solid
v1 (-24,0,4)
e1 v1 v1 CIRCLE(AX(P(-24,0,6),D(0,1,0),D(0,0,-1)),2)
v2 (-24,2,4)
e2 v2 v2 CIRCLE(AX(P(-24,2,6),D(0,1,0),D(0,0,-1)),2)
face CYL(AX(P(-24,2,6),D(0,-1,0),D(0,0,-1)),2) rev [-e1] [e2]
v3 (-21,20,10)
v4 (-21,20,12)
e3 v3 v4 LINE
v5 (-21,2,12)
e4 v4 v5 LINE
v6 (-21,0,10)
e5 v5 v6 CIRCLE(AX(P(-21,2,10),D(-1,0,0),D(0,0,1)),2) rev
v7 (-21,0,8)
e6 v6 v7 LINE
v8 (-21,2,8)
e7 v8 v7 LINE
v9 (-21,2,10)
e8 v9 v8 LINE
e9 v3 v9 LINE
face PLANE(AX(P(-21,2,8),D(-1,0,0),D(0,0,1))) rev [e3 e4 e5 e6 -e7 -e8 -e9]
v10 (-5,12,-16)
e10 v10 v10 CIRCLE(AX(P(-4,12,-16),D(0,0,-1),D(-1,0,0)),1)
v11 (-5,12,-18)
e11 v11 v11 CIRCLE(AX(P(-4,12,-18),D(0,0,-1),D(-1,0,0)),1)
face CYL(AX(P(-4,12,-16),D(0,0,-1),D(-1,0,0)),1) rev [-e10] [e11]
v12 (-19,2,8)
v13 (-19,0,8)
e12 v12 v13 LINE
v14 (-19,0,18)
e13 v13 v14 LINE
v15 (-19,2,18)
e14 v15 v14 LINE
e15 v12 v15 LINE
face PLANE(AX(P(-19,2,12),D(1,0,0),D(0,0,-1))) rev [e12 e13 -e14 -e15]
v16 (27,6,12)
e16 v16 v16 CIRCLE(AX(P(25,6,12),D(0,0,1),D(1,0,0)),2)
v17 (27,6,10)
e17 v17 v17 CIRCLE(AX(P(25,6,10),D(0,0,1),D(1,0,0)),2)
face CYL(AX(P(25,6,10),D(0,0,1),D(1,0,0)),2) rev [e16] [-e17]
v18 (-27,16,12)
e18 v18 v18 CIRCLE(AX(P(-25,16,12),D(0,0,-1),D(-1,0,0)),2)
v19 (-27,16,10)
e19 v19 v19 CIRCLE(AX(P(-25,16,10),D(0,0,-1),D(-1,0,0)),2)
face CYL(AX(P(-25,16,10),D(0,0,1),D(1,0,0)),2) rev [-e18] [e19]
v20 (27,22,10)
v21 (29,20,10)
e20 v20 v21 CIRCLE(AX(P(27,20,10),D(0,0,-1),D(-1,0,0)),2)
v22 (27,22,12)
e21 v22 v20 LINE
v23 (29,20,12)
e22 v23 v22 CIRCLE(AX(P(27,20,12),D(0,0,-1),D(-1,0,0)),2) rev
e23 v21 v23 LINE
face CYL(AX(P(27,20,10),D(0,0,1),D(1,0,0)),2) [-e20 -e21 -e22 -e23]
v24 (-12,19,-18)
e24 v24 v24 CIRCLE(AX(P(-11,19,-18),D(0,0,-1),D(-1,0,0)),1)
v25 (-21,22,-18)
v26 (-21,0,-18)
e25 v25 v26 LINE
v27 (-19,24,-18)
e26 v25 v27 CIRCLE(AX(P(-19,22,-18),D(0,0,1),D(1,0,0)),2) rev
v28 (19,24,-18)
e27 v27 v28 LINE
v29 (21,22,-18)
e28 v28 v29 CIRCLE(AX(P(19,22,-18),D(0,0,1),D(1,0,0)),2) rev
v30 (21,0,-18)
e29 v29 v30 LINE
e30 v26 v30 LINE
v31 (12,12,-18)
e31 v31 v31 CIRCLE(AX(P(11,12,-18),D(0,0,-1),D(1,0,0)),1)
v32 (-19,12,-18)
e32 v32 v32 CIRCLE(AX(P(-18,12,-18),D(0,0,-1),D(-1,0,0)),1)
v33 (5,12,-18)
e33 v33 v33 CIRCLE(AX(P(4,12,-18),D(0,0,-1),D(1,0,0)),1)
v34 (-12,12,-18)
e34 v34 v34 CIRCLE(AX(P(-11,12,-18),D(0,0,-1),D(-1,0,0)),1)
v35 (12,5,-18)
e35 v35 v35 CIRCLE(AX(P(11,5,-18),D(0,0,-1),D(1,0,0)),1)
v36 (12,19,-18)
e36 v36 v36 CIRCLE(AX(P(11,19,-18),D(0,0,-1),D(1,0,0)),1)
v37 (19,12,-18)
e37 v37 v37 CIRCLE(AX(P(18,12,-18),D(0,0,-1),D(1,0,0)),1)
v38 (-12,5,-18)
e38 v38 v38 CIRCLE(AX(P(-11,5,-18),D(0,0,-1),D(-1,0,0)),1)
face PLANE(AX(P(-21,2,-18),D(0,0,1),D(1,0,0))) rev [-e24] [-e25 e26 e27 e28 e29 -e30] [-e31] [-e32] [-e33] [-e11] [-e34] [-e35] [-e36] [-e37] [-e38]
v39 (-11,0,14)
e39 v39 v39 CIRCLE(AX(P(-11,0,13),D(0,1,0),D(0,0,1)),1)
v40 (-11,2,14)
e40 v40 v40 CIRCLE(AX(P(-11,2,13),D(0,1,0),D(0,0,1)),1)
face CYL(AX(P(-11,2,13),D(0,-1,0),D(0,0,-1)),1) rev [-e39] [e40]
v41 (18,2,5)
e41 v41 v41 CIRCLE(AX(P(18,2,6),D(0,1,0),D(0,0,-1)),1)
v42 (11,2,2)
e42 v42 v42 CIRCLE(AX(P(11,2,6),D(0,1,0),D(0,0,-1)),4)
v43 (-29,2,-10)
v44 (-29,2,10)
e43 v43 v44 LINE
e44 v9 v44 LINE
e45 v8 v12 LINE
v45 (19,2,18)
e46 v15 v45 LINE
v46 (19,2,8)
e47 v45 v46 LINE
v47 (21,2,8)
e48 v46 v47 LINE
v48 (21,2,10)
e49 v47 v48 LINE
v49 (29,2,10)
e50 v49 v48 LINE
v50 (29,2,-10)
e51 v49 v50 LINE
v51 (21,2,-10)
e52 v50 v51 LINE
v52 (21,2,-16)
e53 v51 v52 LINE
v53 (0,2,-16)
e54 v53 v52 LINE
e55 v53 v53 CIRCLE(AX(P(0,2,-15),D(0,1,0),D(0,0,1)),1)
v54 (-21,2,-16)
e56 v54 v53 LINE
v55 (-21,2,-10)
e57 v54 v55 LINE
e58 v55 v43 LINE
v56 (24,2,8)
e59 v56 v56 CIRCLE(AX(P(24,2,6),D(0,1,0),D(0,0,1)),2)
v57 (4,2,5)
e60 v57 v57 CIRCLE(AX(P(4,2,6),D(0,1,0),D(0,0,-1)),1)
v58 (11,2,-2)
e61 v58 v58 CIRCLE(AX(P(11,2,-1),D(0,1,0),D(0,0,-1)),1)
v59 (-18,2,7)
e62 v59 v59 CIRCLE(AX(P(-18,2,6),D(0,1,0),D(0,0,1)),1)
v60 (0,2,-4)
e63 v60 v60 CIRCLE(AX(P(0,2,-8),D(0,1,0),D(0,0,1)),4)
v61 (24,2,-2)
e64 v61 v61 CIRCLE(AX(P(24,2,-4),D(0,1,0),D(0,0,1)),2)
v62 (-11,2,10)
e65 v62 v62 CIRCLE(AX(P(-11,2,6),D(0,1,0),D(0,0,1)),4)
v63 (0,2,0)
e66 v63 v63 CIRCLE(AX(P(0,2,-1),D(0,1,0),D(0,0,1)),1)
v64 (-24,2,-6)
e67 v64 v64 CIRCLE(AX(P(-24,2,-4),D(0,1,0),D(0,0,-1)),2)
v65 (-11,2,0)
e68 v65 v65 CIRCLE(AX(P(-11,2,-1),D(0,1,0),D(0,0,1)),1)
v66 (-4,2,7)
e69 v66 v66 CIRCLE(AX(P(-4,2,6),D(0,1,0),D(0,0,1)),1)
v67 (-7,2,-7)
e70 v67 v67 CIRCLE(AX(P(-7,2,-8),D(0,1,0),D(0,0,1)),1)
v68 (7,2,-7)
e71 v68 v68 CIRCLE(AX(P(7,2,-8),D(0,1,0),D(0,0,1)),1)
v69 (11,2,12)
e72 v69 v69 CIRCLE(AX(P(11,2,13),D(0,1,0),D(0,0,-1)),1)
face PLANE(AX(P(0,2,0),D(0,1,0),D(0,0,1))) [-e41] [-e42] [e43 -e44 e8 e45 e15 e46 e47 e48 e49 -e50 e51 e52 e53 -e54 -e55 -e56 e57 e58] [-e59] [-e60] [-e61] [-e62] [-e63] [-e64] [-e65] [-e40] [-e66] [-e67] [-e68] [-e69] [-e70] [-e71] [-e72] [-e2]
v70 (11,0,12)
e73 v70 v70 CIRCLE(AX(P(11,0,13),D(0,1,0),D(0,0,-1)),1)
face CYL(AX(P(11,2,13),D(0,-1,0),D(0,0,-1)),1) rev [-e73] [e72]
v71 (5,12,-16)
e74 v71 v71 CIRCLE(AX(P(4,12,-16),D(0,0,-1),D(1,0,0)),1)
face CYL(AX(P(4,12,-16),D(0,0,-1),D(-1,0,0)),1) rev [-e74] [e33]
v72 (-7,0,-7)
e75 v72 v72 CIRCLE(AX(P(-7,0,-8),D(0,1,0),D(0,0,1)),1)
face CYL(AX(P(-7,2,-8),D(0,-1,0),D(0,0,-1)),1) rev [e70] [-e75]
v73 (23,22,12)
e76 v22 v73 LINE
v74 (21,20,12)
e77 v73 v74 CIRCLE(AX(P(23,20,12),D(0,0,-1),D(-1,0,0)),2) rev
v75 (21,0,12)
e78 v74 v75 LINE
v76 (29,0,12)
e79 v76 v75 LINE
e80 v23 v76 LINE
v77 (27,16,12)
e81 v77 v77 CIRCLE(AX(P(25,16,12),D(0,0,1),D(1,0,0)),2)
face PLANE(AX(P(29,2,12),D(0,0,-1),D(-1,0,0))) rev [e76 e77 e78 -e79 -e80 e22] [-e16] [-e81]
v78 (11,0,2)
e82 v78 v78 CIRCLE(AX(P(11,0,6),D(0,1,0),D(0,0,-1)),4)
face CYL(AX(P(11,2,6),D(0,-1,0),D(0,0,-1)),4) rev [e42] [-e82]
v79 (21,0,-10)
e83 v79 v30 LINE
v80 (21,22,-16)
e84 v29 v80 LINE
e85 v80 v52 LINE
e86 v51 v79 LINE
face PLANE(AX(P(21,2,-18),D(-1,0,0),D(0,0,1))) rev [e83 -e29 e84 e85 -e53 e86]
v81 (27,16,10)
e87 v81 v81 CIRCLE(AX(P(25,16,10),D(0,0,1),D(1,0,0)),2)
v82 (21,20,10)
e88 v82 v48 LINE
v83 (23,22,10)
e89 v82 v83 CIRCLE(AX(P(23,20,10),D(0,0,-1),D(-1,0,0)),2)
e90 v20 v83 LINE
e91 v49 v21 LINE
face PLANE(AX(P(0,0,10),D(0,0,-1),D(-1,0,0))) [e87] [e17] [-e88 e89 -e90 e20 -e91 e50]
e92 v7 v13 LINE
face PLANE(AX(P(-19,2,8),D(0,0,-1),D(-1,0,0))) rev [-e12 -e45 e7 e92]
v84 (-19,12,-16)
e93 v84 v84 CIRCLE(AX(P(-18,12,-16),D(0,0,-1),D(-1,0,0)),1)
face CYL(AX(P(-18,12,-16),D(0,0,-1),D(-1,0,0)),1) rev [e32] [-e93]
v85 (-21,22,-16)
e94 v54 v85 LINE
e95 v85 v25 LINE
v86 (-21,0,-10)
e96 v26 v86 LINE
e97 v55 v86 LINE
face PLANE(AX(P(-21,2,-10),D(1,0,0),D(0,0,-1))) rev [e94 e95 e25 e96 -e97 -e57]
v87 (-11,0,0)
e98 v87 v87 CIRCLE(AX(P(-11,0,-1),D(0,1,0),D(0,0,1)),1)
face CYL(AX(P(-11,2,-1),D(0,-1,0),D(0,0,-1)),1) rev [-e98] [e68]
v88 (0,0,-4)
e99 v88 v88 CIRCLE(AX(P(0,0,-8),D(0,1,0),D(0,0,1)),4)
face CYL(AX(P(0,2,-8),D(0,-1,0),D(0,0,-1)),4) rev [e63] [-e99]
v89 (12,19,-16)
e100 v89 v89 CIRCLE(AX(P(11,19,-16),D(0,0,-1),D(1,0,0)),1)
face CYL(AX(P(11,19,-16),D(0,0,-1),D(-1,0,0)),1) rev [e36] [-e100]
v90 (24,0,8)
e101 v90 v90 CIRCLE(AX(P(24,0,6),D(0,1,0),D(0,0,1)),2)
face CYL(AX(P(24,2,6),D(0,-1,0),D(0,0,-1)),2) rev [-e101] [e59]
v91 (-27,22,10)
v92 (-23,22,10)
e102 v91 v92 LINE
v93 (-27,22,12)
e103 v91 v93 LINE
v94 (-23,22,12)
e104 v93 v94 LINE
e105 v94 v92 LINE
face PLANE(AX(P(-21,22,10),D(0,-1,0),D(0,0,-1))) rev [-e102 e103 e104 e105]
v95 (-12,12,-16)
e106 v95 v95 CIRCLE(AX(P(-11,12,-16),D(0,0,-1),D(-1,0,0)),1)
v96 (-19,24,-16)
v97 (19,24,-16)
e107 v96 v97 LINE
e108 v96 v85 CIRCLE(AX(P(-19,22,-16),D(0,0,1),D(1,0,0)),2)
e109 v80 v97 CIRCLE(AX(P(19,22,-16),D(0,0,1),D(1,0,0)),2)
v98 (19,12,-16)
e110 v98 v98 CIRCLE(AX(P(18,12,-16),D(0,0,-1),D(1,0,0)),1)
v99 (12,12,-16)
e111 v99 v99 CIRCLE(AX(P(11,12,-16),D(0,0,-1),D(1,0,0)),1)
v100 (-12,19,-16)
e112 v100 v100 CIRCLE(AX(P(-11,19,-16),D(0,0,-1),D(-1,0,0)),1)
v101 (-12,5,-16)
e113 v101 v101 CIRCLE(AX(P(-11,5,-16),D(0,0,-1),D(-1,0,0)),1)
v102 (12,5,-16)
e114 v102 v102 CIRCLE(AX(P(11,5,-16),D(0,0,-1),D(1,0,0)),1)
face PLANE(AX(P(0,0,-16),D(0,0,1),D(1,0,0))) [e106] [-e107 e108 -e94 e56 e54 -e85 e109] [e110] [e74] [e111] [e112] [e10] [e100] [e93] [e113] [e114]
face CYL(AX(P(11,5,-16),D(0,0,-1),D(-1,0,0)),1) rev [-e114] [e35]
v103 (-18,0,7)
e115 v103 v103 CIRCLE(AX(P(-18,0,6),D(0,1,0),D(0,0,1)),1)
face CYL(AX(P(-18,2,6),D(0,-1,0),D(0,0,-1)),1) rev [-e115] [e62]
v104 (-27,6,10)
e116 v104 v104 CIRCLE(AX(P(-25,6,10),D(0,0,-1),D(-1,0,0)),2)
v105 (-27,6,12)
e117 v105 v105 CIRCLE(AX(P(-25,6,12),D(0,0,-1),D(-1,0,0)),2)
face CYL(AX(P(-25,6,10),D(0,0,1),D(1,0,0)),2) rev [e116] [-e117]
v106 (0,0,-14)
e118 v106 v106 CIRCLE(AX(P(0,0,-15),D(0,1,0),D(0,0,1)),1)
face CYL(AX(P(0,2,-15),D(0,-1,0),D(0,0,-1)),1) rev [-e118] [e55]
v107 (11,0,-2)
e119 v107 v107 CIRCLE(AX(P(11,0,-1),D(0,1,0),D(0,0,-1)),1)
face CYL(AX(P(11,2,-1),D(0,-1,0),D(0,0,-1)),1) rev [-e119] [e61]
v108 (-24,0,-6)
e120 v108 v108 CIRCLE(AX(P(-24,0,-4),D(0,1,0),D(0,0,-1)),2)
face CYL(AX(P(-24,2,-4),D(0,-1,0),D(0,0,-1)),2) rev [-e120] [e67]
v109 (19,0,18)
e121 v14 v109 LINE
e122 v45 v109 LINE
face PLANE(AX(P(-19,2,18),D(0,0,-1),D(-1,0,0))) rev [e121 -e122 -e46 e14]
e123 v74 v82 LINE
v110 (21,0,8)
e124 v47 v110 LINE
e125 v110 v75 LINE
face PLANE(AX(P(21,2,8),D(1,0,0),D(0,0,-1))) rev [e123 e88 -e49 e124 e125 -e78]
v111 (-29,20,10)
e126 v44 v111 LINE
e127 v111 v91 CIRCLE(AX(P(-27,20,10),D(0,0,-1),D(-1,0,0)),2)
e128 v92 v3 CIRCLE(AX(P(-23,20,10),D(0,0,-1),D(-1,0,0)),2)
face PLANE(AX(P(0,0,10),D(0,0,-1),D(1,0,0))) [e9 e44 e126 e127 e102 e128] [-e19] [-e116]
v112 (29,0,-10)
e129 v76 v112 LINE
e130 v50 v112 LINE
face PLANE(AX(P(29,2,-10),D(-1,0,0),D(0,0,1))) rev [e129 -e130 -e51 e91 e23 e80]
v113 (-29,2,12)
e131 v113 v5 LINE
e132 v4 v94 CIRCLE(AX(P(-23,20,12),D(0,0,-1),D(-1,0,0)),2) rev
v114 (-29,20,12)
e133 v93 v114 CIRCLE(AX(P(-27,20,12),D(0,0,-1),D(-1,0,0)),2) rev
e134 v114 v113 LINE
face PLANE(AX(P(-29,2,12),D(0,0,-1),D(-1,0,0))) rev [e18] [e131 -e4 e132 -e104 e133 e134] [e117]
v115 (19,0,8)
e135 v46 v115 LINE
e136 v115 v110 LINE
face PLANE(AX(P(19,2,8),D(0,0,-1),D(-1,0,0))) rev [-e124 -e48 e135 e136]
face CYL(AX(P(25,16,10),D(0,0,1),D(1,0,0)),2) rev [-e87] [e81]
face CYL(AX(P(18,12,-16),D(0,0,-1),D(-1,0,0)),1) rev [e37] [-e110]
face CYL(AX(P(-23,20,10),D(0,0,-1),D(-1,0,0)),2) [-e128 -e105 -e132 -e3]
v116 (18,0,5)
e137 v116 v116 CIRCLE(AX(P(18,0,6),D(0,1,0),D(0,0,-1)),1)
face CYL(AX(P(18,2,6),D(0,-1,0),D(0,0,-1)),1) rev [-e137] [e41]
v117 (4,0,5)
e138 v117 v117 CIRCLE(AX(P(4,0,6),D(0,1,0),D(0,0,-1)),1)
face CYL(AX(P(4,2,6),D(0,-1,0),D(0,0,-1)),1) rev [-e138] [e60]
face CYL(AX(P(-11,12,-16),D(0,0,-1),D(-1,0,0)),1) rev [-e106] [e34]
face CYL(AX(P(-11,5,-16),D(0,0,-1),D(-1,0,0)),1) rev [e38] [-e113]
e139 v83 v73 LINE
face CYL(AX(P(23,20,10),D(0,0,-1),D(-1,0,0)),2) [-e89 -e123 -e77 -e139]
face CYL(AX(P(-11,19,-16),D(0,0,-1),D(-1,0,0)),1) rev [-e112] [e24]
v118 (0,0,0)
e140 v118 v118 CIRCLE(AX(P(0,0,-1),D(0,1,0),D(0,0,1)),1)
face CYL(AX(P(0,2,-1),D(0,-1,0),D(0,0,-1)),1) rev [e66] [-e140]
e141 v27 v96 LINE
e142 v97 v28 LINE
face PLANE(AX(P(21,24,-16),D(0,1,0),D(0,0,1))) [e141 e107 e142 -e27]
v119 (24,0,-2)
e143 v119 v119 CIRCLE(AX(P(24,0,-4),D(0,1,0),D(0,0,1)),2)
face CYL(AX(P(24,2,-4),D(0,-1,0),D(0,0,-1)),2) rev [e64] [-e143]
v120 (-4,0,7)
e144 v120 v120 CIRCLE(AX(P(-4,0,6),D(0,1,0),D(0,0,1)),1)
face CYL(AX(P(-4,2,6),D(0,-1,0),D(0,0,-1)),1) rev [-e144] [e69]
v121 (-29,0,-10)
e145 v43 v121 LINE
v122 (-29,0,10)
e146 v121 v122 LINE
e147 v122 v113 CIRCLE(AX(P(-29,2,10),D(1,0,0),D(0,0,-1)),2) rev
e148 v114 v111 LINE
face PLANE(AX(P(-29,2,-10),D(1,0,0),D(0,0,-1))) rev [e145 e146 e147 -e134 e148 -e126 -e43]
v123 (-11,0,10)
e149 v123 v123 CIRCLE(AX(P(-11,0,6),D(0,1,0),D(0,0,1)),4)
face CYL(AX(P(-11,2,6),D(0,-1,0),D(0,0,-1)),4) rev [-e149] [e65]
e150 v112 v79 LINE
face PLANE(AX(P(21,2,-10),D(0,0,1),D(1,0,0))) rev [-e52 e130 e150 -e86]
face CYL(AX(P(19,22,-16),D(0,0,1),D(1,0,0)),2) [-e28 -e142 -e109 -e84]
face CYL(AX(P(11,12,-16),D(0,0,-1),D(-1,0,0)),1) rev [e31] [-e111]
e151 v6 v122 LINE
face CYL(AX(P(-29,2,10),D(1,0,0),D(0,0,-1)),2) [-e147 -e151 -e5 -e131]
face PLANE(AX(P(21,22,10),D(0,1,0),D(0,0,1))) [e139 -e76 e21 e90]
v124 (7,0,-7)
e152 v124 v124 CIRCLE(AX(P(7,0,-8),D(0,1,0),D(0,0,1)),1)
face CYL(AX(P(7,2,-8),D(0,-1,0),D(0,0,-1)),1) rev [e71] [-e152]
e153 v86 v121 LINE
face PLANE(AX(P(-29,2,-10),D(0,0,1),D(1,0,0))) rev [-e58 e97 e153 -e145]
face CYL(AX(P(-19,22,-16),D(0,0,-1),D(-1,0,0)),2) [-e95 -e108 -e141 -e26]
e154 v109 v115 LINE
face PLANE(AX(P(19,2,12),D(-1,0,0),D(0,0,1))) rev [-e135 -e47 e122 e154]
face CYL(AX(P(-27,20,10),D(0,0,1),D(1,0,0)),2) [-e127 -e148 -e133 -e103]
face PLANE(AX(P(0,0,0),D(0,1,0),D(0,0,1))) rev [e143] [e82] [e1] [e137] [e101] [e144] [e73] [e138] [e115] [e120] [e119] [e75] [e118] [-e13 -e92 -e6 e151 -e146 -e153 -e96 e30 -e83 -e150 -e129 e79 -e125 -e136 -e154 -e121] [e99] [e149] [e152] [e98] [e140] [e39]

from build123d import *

# Parameters (mm, degrees)
SKETCH_1_R              = 4
SKETCH_1_R_2            = 1
SKETCH_1_R_3            = 2
EXTRUDE_1_DEPTH         = 2
FILLET_1_R              = 2
FILLET_2_R              = 2
FILLET_3_R              = 2
FILLET_4_R              = 2
SKETCH_2_W              = 42
SKETCH_2_H              = 24
SKETCH_2_R              = 1
EXTRUDE_2_DEPTH         = 2
FILLET_5_R              = 2
FILLET_6_R              = 2
FILLET_7_R              = 2
SKETCH_3_W              = 8
SKETCH_3_H              = 22
SKETCH_3_R              = 2
EXTRUDE_3_DEPTH         = 2
FILLET_8_R              = 2
FILLET_9_R              = 2
FILLET_10_R             = 2
FILLET_10_OF_MIRROR_3_R = 2
FILLET_11_R             = 2
FILLET_12_R             = 2


with BuildPart() as part:
    # 草图1 → 凸台-拉伸1 (new body)
    with BuildSketch(Plane(origin=(0, 0, 0), x_dir=(1, 0, 0), z_dir=(0, 1, 0))):
        Polygon((-29, 10), (-21, 10), (-21, 18), (21, 18), (21, 10), (29, 10), (29, -12), (21, -12), (21, -8), (19, -8), (19, -12), (19, -18), (-19, -18), (-19, -12), (-19, -8), (-21, -8), (-21, -12), (-29, -12), align=None)
        with Locations(Location((-11, -6, 0), (0, 0, 270))):
            Circle(SKETCH_1_R, mode=Mode.SUBTRACT)
        with Locations(Location((-11, 1, 0), (0, 0, 270))):
            Circle(SKETCH_1_R_2, mode=Mode.SUBTRACT)
        with Locations(Location((0, 8, 0), (0, 0, 270))):
            Circle(SKETCH_1_R, mode=Mode.SUBTRACT)
        with Locations(Location((0, 15, 0), (0, 0, 270))):
            Circle(SKETCH_1_R_2, mode=Mode.SUBTRACT)
        with Locations(Location((7, 8, 0), (0, 0, 270))):
            Circle(SKETCH_1_R_2, mode=Mode.SUBTRACT)
        with Locations(Location((0, 1, 0), (0, 0, 270))):
            Circle(SKETCH_1_R_2, mode=Mode.SUBTRACT)
        with Locations(Location((-7, 8, 0), (0, 0, 270))):
            Circle(SKETCH_1_R_2, mode=Mode.SUBTRACT)
        with Locations(Location((-4, -6, 0), (0, 0, 270))):
            Circle(SKETCH_1_R_2, mode=Mode.SUBTRACT)
        with Locations(Location((-11, -13, 0), (0, 0, 270))):
            Circle(SKETCH_1_R_2, mode=Mode.SUBTRACT)
        with Locations(Location((-18, -6, 0), (0, 0, 270))):
            Circle(SKETCH_1_R_2, mode=Mode.SUBTRACT)
        with Locations(Location((18, -6, 0), (0, 0, 90))):
            Circle(SKETCH_1_R_2, mode=Mode.SUBTRACT)
        with Locations(Location((11, -13, 0), (0, 0, 90))):
            Circle(SKETCH_1_R_2, mode=Mode.SUBTRACT)
        with Locations(Location((4, -6, 0), (0, 0, 90))):
            Circle(SKETCH_1_R_2, mode=Mode.SUBTRACT)
        with Locations(Location((11, -6, 0), (0, 0, 90))):
            Circle(SKETCH_1_R, mode=Mode.SUBTRACT)
        with Locations(Location((11, 1, 0), (0, 0, 90))):
            Circle(SKETCH_1_R_2, mode=Mode.SUBTRACT)
        with Locations(Location((24, -6, 0), (0, 0, 270))):
            Circle(SKETCH_1_R_3, mode=Mode.SUBTRACT)
        with Locations(Location((24, 4, 0), (0, 0, 270))):
            Circle(SKETCH_1_R_3, mode=Mode.SUBTRACT)
        with Locations(Location((-24, -6, 0), (0, 0, 90))):
            Circle(SKETCH_1_R_3, mode=Mode.SUBTRACT)
        with Locations(Location((-24, 4, 0), (0, 0, 90))):
            Circle(SKETCH_1_R_3, mode=Mode.SUBTRACT)
    extrude_1 = extrude(amount=EXTRUDE_1_DEPTH)

    # 圆角1
    fillet_1_edges = [part.edges().sort_by_distance(p)[0] for p in [
        (29, 1, -10),
    ]]
    fillet(fillet_1_edges, radius=FILLET_1_R)

    # 圆角2
    fillet_2_edges = [part.edges().sort_by_distance(p)[0] for p in [
        (-29, 1, -10),
    ]]
    fillet(fillet_2_edges, radius=FILLET_2_R)

    # 圆角3
    fillet_3_edges = [part.edges().sort_by_distance(p)[0] for p in [
        (-19, 1, 18),
    ]]
    fillet(fillet_3_edges, radius=FILLET_3_R)

    # 圆角4
    fillet_4_edges = [part.edges().sort_by_distance(p)[0] for p in [
        (19, 1, 18),
    ]]
    fillet(fillet_4_edges, radius=FILLET_4_R)

    # 草图2 → 凸台-拉伸2 (add)
    with BuildSketch(Plane(origin=(0, 0, -18), x_dir=(-1, 0, 0), z_dir=(0, 0, -1))):
        with Locations((0, 12)):
            Rectangle(SKETCH_2_W, SKETCH_2_H)
        with Locations((11, 12)):
            Circle(SKETCH_2_R, mode=Mode.SUBTRACT)
        with Locations((11, 19)):
            Circle(SKETCH_2_R, mode=Mode.SUBTRACT)
        with Locations((18, 12)):
            Circle(SKETCH_2_R, mode=Mode.SUBTRACT)
        with Locations((11, 5)):
            Circle(SKETCH_2_R, mode=Mode.SUBTRACT)
        with Locations((4, 12)):
            Circle(SKETCH_2_R, mode=Mode.SUBTRACT)
        with Locations(Location((-18, 12, 0), (0, 0, 180))):
            Circle(SKETCH_2_R, mode=Mode.SUBTRACT)
        with Locations(Location((-11, 19, 0), (0, 0, 180))):
            Circle(SKETCH_2_R, mode=Mode.SUBTRACT)
        with Locations(Location((-11, 5, 0), (0, 0, 180))):
            Circle(SKETCH_2_R, mode=Mode.SUBTRACT)
        with Locations(Location((-4, 12, 0), (0, 0, 180))):
            Circle(SKETCH_2_R, mode=Mode.SUBTRACT)
        with Locations(Location((-11, 12, 0), (0, 0, 180))):
            Circle(SKETCH_2_R, mode=Mode.SUBTRACT)
    extrude(amount=-EXTRUDE_2_DEPTH)

    # 圆角5
    fillet_5_edges = [part.edges().sort_by_distance(p)[0] for p in [
        (21, 24, -17),
    ]]
    fillet(fillet_5_edges, radius=FILLET_5_R)

    # 圆角6
    fillet_6_edges = [part.edges().sort_by_distance(p)[0] for p in [
        (-21, 24, -17),
    ]]
    fillet(fillet_6_edges, radius=FILLET_6_R)

    # 圆角7
    fillet_7_edges = [part.edges().sort_by_distance(p)[0] for p in [
        (0, 0, -18),
    ]]
    fillet(fillet_7_edges, radius=FILLET_7_R - 0.0001)  # a hair under: the kernel refuses the full size

    # 草图3 → 凸台-拉伸3 (add)
    with BuildSketch(Plane.XY.offset(12)):
        with Locations((25, 11)):
            Rectangle(SKETCH_3_W, SKETCH_3_H)
        with Locations((25, 16)):
            Circle(SKETCH_3_R, mode=Mode.SUBTRACT)
        with Locations((25, 6)):
            Circle(SKETCH_3_R, mode=Mode.SUBTRACT)
    extrude_3 = extrude(amount=-EXTRUDE_3_DEPTH)

    # 圆角8
    fillet_8_edges = [part.edges().sort_by_distance(p)[0] for p in [
        (25, 0, 12),
    ]]
    fillet(fillet_8_edges, radius=FILLET_8_R)

    # 圆角9
    fillet_9_edges = [part.edges().sort_by_distance(p)[0] for p in [
        (21, 22, 11),
    ]]
    fillet(fillet_9_edges, radius=FILLET_9_R)

    # 圆角10
    fillet_10_edges = [part.edges().sort_by_distance(p)[0] for p in [
        (29, 22, 11),
    ]]
    fillet(fillet_10_edges, radius=FILLET_10_R)

    # 镜向3: 凸台-拉伸1, 凸台-拉伸3 across plane
    add(extrude_1.mirror(Plane(origin=(0, 0, 0), x_dir=(0, 0, 1), z_dir=(1, 0, 0))))
    add(extrude_3.mirror(Plane(origin=(0, 0, 0), x_dir=(0, 0, 1), z_dir=(1, 0, 0))))

    # 圆角10 of 镜向3
    fillet_10_of_mirror_3_edges = [part.edges().sort_by_distance(p)[0] for p in [
        (-29, 22, 11),
    ]]
    fillet(fillet_10_of_mirror_3_edges, radius=FILLET_10_OF_MIRROR_3_R)

    # 圆角11
    fillet_11_edges = [part.edges().sort_by_distance(p)[0] for p in [
        (-21, 22, 11),
    ]]
    fillet(fillet_11_edges, radius=FILLET_11_R)

    # 圆角12
    fillet_12_edges = [part.edges().sort_by_distance(p)[0] for p in [
        (-25, 0, 12),
    ]]
    fillet(fillet_12_edges, radius=FILLET_12_R)


solid = part.part
